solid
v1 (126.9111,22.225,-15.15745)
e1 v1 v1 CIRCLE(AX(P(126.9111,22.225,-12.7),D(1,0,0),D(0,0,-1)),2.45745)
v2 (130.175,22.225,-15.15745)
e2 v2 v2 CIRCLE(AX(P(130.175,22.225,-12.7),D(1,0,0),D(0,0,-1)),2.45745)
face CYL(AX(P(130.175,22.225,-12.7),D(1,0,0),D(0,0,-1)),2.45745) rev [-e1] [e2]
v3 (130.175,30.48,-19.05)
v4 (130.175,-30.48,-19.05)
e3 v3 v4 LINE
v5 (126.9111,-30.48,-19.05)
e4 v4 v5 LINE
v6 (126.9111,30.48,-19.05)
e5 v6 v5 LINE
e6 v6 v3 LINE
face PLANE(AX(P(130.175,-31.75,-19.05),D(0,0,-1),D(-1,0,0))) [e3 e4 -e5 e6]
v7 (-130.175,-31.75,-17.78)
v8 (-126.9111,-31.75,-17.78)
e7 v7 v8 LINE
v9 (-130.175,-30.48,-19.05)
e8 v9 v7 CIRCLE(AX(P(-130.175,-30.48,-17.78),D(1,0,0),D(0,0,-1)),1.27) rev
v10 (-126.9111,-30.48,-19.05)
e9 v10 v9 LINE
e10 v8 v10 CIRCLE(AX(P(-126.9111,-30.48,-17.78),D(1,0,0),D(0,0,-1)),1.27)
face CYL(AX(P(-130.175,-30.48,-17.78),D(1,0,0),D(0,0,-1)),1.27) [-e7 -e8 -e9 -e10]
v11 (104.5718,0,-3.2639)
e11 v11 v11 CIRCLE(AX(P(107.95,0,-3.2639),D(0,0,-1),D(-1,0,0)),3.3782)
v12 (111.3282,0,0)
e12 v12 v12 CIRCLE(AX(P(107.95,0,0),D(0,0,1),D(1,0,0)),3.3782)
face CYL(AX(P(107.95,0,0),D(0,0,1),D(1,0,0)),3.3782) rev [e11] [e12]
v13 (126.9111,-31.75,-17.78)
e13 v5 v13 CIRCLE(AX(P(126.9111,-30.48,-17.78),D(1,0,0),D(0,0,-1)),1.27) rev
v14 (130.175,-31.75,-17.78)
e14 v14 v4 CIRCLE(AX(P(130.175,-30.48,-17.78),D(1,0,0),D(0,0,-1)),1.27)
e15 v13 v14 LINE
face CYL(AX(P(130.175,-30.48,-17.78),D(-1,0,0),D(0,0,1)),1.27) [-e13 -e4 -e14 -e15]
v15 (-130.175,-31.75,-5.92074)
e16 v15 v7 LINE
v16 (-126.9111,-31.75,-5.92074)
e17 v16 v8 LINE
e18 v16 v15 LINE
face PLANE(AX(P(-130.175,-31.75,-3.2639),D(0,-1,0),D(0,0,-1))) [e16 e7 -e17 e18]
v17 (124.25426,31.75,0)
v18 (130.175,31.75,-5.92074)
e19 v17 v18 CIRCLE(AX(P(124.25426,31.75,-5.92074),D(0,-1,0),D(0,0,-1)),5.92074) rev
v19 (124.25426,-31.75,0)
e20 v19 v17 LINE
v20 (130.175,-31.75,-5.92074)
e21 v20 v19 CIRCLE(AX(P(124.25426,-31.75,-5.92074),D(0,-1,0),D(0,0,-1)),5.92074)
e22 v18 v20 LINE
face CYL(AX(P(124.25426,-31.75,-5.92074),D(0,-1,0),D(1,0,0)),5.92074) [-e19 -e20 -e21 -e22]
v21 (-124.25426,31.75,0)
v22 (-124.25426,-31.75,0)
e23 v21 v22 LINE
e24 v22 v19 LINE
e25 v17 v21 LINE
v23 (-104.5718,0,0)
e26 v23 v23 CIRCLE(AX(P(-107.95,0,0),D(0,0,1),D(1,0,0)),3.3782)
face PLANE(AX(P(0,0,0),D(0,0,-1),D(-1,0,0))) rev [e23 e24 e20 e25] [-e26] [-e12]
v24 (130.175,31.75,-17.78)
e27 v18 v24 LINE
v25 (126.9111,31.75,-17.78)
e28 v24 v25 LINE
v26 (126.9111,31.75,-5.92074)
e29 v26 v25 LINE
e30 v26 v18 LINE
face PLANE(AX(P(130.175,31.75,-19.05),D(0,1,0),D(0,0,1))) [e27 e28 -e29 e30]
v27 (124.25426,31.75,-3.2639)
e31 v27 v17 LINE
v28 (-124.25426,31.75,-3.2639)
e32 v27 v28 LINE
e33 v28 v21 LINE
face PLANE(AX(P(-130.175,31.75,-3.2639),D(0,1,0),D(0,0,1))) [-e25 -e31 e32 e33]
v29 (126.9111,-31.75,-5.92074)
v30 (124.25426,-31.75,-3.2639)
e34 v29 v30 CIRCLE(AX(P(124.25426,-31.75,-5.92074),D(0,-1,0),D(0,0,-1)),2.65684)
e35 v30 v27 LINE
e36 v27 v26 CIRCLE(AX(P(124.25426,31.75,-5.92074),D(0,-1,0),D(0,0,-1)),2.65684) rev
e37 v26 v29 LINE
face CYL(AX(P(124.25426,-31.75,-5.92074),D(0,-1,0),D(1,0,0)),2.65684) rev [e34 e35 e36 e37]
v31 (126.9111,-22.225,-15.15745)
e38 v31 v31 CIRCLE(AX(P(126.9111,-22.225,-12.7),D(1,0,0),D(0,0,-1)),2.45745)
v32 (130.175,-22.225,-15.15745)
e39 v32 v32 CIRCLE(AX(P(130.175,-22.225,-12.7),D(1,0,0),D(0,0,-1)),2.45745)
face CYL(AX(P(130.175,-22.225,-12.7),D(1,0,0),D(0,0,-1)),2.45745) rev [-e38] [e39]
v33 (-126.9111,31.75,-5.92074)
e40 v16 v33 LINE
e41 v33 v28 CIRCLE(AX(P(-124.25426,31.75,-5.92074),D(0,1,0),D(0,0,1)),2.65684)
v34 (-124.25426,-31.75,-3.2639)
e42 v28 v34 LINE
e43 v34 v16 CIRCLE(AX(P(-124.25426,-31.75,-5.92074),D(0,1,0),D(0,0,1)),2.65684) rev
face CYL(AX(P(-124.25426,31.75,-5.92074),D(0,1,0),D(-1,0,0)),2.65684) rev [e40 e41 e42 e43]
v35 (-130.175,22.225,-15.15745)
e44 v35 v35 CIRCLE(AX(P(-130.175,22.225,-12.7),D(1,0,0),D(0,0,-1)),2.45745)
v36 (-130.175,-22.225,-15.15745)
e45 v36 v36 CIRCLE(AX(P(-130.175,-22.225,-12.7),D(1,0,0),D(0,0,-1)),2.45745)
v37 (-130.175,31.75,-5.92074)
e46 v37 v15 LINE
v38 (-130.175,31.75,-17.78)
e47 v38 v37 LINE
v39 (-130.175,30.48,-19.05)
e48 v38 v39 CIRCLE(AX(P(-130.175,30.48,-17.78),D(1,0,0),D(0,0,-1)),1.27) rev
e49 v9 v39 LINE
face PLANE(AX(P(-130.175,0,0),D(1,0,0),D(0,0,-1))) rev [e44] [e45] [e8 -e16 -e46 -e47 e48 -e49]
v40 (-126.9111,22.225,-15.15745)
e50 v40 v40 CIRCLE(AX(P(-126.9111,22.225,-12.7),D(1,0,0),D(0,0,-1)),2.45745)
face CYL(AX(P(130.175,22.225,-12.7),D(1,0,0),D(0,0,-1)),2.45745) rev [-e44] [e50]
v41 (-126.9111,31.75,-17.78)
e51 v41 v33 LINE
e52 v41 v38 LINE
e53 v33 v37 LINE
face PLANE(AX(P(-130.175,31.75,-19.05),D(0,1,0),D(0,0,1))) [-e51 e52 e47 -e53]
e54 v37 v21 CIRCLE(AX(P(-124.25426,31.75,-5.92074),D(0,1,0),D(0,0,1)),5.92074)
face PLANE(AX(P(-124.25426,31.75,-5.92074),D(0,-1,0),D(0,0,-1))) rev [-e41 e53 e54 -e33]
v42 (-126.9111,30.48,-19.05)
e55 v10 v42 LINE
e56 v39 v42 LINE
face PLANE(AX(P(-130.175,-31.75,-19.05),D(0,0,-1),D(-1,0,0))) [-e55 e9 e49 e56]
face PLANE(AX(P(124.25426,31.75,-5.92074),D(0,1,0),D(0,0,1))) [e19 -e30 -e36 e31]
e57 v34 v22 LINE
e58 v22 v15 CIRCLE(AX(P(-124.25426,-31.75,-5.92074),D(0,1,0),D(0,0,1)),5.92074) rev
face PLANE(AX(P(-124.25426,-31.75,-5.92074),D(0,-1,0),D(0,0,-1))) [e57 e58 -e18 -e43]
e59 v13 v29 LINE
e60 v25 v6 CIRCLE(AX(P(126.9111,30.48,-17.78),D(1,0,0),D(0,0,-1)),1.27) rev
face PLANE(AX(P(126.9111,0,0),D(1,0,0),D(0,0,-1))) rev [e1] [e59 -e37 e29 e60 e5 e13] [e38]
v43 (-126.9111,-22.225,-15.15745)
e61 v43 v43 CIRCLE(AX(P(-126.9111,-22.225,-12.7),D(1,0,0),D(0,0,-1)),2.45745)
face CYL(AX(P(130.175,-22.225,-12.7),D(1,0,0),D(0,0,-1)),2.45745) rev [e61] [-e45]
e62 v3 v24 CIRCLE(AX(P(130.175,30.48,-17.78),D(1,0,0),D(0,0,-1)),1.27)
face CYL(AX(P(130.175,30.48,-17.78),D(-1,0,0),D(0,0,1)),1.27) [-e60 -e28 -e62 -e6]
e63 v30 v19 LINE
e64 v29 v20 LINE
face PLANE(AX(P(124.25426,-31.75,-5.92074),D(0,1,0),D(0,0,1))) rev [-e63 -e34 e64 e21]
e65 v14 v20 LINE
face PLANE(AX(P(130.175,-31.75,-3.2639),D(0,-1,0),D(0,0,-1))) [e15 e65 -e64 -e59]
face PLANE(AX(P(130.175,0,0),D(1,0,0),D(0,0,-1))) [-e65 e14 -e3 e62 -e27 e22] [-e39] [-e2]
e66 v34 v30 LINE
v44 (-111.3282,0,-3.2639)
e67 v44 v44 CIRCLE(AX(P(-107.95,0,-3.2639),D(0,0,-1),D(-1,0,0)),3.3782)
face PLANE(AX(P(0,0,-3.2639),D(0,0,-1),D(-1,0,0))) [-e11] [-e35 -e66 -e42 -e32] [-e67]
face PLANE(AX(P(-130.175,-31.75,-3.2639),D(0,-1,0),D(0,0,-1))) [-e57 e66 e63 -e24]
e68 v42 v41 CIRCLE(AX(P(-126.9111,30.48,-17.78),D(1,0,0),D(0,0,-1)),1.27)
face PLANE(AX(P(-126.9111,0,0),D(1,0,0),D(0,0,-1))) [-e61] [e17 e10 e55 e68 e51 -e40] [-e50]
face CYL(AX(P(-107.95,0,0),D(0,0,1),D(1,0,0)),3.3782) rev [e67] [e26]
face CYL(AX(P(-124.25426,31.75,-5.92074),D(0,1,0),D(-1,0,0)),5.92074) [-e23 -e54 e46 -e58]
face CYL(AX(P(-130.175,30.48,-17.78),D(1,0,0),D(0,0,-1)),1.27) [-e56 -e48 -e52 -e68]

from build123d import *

# Parameters (mm, degrees)
SKETCH1_W                      = 260.35
SKETCH1_H                      = 63.5
BASE_FLANGE1_DEPTH             = 3.2639
EDGE_FLANGE1_STRIP_W           = 18.36928
EDGE_FLANGE1_STRIP_H           = 3.2639
EDGE_FLANGE1_STRIP_CUT_DEPTH   = 63.5
EDGE_FLANGE1_STRIP_2_W         = 18.36928
EDGE_FLANGE1_STRIP_2_H         = 3.2639
EDGE_FLANGE1_STRIP_CUT_2_DEPTH = 63.5
EDGE_FLANGE1_DEPTH             = 63.5
EDGE_FLANGE1_BEND_DEPTH        = 63.5
F_10_0_1935_DIAMETER_HOLE1_D   = 4.9149
FILLET1_R                      = 1.27
F_1_4_CLEARANCE_HOLE1_D        = 6.7564


# Sheet-metal steps are written as plain solids
with BuildPart() as part:
    # Sketch1 → Base-Flange1 (new body)
    with BuildSketch(Plane.XY):
        Rectangle(SKETCH1_W, SKETCH1_H)
    extrude(amount=-BASE_FLANGE1_DEPTH)

    # Edge-Flange1 strip (across the edge) → Edge-Flange1 strip cut (cut)
    with BuildSketch(Plane(origin=(130.175, 31.75, -3.2639), x_dir=(-1, 0, 0), z_dir=(0, -1, 0))):
        with Locations((-3.2639, -1.63195)):
            Rectangle(EDGE_FLANGE1_STRIP_W, EDGE_FLANGE1_STRIP_H)
    extrude(amount=EDGE_FLANGE1_STRIP_CUT_DEPTH, mode=Mode.SUBTRACT)

    # Edge-Flange1 strip 2 (across the edge) → Edge-Flange1 strip cut 2 (cut)
    with BuildSketch(Plane(origin=(-130.175, -31.75, -3.2639), x_dir=(1, 0, 0), z_dir=(0, 1, 0))):
        with Locations((-3.2639, -1.63195)):
            Rectangle(EDGE_FLANGE1_STRIP_2_W, EDGE_FLANGE1_STRIP_2_H)
    extrude(amount=EDGE_FLANGE1_STRIP_CUT_2_DEPTH, mode=Mode.SUBTRACT)

    # Edge-Flange1 section (across the edge) → Edge-Flange1 (add)
    with BuildSketch(Plane(origin=(130.175, 31.75, -3.2639), x_dir=(-1, 0, 0), z_dir=(0, -1, 0))):
        with BuildLine():
            Line((0, 2.65684), (0, 15.7861))
            Line((0, 15.7861), (3.2639, 15.7861))
            Line((3.2639, 15.7861), (3.2639, 2.65684))
            ThreePointArc((3.2639, 2.65684), (4.042070419, 0.778170419), (5.92074, 0))
            Line((5.92074, 0), (5.92074, -3.2639))
            ThreePointArc((5.92074, -3.2639), (1.734144596, -1.529755404), (0, 2.65684))
        make_face()
    extrude(amount=EDGE_FLANGE1_DEPTH)

    # Edge-Flange1 section 2 (across the edge) → Edge-Flange1 bend (add)
    with BuildSketch(Plane(origin=(-130.175, -31.75, -3.2639), x_dir=(1, 0, 0), z_dir=(0, 1, 0))):
        with BuildLine():
            Line((0, 2.65684), (0, 15.7861))
            Line((0, 15.7861), (3.2639, 15.7861))
            Line((3.2639, 15.7861), (3.2639, 2.65684))
            ThreePointArc((3.2639, 2.65684), (4.042070419, 0.778170419), (5.92074, 0))
            Line((5.92074, 0), (5.92074, -3.2639))
            ThreePointArc((5.92074, -3.2639), (1.734144596, -1.529755404), (0, 2.65684))
        make_face()
    extrude(amount=EDGE_FLANGE1_BEND_DEPTH)

    # #10 (0.1935) Diameter Hole1 (through all)
    with Locations(Plane(origin=(130.175, 0, 0), x_dir=(0, 0, -1), z_dir=(1, 0, 0))):
        with Locations((12.7, 22.225), (12.7, -22.225)):
            Hole(F_10_0_1935_DIAMETER_HOLE1_D / 2)

    # Fillet1
    fillet1_edges = [part.edges().sort_by_distance(p)[0] for p in [
        (128.54305, 31.75, -19.05),
        (128.54305, -31.75, -19.05),
        (-128.54305, -31.75, -19.05),
        (-128.54305, 31.75, -19.05),
    ]]
    fillet(fillet1_edges, radius=FILLET1_R)

    # 1/4 Clearance Hole1 (through all)
    with Locations(Plane.XY):
        with Locations((-107.95, 0), (107.95, 0)):
            Hole(F_1_4_CLEARANCE_HOLE1_D / 2)


solid = part.part
